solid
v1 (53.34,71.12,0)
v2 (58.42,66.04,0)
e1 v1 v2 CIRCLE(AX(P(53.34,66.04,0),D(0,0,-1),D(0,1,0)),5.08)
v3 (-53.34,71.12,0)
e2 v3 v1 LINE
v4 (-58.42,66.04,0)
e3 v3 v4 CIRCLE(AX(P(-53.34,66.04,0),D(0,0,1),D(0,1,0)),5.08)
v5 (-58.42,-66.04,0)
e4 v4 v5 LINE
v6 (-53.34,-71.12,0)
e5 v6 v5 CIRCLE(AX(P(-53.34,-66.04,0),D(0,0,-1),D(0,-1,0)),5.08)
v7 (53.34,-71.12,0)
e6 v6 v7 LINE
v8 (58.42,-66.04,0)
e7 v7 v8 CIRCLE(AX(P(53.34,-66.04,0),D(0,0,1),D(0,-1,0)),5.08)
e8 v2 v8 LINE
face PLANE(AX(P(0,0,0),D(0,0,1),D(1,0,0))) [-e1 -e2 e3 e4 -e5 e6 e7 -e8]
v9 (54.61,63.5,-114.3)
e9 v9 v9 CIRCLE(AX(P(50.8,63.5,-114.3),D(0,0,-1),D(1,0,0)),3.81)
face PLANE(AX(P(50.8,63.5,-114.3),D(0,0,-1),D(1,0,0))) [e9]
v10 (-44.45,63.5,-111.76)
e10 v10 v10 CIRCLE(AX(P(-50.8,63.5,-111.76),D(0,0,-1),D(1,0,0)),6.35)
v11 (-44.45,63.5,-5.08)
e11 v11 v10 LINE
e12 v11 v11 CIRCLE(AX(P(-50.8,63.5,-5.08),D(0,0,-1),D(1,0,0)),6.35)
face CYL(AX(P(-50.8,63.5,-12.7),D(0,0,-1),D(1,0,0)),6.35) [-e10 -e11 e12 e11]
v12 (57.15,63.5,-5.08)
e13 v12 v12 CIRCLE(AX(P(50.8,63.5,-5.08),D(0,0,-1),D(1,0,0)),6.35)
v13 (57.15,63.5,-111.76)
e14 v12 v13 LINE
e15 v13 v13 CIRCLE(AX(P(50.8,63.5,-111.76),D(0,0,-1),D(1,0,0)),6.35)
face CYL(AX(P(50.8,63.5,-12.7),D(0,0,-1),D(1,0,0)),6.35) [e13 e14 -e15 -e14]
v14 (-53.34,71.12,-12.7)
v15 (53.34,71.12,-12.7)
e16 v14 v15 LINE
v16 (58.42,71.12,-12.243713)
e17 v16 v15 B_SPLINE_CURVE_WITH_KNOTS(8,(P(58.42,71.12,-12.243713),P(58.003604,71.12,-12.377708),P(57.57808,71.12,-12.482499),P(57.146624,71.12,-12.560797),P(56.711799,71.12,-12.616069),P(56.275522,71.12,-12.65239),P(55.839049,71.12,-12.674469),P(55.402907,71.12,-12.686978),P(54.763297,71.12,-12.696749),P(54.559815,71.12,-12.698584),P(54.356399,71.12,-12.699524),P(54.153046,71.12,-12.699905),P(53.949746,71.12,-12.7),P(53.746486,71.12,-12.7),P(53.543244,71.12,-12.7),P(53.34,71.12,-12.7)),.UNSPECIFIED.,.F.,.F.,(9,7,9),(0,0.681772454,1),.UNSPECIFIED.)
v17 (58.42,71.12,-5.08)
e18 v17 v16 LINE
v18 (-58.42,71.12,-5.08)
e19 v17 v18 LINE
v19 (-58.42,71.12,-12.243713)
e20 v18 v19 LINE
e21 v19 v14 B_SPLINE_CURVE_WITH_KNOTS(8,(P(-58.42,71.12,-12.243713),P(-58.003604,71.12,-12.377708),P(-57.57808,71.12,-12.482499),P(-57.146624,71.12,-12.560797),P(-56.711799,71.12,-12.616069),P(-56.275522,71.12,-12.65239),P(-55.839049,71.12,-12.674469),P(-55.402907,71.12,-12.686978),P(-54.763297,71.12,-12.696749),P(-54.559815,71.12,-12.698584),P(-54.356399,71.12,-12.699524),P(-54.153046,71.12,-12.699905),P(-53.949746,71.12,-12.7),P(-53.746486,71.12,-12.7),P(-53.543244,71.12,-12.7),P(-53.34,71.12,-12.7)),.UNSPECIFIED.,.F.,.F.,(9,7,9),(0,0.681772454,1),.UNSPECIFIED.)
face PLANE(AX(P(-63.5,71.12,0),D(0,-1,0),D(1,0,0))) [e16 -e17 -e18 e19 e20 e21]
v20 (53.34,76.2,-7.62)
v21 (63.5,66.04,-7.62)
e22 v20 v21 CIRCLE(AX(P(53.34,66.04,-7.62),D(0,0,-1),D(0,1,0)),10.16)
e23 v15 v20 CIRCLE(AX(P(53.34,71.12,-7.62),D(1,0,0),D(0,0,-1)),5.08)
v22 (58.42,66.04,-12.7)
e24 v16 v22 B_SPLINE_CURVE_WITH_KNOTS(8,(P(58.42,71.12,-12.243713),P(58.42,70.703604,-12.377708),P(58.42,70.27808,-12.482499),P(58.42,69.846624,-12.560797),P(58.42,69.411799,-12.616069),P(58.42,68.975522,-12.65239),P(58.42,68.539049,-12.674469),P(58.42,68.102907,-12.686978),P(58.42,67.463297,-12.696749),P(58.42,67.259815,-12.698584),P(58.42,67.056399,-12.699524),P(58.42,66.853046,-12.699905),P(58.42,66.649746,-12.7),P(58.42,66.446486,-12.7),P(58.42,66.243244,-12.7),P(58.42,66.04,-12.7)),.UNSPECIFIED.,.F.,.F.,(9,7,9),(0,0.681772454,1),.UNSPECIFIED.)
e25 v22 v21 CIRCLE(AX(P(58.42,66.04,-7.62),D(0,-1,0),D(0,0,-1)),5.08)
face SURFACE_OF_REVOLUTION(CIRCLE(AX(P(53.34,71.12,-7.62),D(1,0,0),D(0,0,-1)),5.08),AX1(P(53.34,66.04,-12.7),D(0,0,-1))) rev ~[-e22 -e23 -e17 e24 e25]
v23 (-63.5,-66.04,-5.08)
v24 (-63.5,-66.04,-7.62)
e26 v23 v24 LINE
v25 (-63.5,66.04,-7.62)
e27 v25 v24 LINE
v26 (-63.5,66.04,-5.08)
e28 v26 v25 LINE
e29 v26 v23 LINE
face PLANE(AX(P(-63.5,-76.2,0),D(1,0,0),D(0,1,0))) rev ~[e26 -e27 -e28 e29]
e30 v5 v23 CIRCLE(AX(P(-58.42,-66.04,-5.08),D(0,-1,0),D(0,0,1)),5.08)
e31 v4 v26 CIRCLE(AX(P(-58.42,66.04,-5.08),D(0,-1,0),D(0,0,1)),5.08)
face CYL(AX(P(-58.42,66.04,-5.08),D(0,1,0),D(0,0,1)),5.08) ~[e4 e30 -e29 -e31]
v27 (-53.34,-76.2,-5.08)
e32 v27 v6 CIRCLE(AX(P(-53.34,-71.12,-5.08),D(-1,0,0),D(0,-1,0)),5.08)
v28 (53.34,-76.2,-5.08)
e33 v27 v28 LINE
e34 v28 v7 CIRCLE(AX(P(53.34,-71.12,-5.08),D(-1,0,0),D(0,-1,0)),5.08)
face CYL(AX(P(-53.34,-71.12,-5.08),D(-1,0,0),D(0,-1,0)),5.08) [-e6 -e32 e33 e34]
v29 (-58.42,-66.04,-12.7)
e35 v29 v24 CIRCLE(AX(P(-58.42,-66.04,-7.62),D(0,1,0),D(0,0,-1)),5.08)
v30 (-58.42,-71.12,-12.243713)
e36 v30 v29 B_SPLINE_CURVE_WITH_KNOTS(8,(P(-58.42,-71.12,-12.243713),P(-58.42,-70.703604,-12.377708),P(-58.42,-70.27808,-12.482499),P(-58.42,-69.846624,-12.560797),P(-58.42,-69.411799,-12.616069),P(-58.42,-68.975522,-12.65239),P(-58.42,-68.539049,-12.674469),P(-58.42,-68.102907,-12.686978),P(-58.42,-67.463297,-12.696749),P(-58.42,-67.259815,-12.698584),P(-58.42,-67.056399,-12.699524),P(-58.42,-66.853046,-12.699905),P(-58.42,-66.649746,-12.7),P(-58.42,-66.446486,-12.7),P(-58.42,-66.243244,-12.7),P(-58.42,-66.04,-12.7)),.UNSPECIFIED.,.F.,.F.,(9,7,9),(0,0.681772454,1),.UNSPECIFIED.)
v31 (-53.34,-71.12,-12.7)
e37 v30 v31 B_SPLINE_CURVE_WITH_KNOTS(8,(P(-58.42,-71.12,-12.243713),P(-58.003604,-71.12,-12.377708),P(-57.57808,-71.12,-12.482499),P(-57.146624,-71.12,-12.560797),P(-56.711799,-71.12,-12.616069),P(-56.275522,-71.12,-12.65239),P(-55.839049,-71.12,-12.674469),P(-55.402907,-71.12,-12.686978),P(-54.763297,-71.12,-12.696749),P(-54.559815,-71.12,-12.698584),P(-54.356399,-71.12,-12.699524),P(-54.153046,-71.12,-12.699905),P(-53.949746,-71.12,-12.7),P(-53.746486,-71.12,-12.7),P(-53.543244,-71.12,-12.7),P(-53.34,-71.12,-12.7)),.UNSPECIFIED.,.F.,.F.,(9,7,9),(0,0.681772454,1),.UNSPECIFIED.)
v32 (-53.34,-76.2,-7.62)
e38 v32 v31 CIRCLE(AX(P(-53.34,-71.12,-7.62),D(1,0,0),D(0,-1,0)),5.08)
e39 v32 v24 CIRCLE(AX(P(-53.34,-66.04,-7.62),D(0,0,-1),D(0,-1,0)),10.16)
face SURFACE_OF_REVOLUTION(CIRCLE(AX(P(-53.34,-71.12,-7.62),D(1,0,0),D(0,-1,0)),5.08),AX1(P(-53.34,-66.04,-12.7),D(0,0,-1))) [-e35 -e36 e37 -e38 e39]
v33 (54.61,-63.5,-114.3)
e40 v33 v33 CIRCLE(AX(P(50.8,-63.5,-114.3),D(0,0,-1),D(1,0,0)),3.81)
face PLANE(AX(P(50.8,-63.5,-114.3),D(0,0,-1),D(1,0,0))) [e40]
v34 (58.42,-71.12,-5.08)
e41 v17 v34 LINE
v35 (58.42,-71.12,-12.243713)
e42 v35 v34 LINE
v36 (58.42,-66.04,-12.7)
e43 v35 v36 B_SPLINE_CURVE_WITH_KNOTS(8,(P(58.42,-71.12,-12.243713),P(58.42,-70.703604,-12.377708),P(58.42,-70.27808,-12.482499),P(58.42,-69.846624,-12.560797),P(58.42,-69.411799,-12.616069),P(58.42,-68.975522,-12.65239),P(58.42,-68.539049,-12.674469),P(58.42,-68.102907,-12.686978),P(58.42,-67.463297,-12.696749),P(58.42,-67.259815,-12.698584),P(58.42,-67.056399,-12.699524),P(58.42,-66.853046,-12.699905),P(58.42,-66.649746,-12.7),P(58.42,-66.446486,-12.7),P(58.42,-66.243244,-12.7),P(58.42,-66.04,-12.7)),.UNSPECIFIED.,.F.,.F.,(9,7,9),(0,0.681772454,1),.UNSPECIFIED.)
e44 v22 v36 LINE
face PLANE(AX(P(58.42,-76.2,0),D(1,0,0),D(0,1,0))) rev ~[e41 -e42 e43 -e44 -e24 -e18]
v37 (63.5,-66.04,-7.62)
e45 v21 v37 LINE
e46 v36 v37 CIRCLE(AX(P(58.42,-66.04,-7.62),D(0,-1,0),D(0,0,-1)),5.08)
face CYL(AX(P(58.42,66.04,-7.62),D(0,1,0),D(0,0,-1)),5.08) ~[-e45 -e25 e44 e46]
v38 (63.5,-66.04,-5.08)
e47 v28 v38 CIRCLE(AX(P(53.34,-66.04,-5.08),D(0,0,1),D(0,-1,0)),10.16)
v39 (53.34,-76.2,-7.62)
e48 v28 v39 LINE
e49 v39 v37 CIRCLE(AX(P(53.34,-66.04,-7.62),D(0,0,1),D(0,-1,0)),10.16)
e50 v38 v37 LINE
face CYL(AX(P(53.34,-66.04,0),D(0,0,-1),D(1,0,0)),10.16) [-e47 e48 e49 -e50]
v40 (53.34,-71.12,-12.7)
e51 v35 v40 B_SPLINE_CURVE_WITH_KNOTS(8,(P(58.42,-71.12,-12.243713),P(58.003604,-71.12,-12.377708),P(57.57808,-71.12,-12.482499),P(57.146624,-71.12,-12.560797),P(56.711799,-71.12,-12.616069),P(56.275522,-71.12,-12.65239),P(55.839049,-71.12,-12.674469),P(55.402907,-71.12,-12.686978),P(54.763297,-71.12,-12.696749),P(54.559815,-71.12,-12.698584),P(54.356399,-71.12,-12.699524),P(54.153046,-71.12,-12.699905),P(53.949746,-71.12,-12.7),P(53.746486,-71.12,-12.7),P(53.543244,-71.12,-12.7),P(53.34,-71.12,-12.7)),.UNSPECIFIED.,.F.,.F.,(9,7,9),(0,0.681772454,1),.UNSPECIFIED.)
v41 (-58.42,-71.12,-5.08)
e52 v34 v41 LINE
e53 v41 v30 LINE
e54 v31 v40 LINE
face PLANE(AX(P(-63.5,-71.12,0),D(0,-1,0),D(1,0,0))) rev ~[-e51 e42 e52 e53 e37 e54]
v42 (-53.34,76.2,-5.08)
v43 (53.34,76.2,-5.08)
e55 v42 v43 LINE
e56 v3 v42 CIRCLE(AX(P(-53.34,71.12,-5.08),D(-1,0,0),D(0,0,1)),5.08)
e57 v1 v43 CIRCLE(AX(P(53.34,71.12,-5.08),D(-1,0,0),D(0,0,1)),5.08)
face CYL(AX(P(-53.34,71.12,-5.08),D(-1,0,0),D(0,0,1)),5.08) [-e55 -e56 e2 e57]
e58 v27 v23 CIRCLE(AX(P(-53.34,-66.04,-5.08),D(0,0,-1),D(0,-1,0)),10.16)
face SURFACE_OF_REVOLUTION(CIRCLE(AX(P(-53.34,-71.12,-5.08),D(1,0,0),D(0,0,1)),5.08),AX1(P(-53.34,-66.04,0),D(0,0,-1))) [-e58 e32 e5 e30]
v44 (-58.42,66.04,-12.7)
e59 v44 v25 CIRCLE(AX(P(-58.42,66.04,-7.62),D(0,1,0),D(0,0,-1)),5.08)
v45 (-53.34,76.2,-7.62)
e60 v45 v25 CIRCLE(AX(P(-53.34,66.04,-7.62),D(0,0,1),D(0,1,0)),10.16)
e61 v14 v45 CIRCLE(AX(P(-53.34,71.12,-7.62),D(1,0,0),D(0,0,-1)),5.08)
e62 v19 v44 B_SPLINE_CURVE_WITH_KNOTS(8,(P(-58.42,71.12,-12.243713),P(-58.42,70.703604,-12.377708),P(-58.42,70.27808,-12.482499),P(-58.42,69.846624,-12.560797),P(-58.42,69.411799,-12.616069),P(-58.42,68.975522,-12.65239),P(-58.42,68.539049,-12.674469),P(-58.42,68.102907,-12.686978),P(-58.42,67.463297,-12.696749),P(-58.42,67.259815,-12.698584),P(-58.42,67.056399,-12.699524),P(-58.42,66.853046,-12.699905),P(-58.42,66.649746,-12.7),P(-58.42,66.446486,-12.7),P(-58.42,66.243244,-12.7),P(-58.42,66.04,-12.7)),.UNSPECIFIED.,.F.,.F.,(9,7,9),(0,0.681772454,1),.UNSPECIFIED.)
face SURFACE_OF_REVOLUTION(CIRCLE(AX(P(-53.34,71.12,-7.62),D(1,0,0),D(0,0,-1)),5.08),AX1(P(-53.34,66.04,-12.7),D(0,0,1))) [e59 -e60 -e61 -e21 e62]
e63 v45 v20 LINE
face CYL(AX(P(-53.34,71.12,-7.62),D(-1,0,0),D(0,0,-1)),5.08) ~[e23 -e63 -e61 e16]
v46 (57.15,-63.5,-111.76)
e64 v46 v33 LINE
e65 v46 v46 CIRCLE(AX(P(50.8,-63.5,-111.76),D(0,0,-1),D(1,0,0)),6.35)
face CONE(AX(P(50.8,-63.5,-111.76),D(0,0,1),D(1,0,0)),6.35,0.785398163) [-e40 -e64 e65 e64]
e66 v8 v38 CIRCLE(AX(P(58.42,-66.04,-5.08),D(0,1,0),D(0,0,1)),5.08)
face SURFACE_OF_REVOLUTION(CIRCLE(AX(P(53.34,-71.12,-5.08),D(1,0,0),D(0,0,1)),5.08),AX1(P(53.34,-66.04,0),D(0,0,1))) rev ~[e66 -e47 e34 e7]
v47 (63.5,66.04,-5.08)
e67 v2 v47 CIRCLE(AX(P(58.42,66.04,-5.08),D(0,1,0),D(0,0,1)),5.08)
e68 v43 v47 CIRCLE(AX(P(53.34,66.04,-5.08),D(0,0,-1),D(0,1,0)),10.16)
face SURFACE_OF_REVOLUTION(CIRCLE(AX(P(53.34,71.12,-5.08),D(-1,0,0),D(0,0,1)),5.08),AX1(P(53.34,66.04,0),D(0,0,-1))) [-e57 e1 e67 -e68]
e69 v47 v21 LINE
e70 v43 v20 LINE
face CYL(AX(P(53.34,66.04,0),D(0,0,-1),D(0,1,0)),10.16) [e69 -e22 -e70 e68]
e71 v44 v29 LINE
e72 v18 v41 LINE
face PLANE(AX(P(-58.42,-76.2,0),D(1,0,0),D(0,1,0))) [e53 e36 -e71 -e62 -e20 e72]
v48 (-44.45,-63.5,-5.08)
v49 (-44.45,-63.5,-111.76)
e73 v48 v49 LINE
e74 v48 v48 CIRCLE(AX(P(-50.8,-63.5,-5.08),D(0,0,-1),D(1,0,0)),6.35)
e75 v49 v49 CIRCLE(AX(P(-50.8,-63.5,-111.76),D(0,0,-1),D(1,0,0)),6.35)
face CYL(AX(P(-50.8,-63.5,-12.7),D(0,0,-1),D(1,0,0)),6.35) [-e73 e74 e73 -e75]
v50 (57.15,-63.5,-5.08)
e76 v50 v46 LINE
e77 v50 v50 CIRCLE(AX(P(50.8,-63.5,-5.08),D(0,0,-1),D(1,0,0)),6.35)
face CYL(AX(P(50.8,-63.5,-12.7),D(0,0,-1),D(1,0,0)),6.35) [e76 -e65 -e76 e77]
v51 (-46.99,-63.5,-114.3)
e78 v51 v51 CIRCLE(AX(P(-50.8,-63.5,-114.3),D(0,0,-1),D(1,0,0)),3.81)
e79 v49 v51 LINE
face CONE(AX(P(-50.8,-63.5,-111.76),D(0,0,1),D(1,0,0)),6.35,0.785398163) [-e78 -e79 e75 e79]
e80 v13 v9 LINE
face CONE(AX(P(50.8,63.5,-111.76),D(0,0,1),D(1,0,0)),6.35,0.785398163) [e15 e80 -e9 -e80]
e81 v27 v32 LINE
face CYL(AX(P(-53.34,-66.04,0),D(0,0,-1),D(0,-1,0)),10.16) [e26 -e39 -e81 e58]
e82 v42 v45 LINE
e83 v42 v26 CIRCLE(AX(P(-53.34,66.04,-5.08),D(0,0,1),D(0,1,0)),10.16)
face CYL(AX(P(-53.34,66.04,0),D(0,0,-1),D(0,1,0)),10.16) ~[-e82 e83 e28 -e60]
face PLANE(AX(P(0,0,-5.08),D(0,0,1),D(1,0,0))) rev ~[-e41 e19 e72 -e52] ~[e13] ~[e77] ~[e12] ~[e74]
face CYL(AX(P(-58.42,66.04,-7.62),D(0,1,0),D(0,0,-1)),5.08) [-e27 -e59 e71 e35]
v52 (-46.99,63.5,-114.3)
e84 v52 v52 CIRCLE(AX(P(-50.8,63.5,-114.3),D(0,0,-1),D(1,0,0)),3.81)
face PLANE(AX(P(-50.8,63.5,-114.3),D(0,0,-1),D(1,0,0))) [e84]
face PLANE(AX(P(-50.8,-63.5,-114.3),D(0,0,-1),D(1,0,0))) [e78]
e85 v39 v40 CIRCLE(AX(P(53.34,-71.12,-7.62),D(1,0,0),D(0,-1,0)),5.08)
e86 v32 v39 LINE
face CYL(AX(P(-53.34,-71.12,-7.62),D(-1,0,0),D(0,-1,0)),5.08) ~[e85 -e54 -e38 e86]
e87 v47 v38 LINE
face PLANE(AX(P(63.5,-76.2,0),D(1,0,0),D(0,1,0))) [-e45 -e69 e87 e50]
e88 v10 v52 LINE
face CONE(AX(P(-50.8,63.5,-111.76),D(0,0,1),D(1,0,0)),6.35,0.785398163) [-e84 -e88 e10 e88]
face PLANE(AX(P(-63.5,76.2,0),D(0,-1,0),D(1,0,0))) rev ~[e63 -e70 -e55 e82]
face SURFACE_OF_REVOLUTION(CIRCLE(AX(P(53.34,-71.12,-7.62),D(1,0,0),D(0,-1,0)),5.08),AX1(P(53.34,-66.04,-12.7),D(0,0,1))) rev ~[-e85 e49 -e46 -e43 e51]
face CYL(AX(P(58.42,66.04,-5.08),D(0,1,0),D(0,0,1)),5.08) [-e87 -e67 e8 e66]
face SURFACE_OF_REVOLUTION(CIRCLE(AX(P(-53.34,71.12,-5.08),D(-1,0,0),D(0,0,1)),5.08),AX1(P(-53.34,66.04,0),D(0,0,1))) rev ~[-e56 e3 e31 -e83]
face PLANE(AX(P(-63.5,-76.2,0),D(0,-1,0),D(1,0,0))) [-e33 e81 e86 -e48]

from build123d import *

# Parameters (mm, degrees)
F0_W          = 127
F0_H          = 152.4
F1_DEPTH      = 12.7
F2_T          = -5.08
F3_R          = 6.35
F4_DEPTH      = 101.6
F4_DEPTH_BACK = 7.62
F5_R          = 10.16
F6_T1_DEPTH   = 132.08
F6_T3_DEPTH   = 106.68
F6_T6_ANGLE   = 90
F6_T8_ANGLE   = 90
F6_T10_ANGLE  = 90
F6_T12_ANGLE  = 90
F6_T14_ANGLE  = 90
F6_T16_ANGLE  = 90
F6_T18_ANGLE  = 90
F6_T20_ANGLE  = 90
F7_SIZE       = 2.54


# Not quite as in the source:
# - a fillet or chamfer that OpenCascade refuses, or shapes differently, is made with other operations: its cross-section is extruded or revolved along the edge and cut away or added


with BuildPart() as f1:
    # F0 (on Top) → F1 (new body)
    with BuildSketch(Plane.XY):
        Rectangle(F0_W, F0_H)
    extrude(amount=-F1_DEPTH)

    # F2
    f2_openings = [f1.faces().sort_by_distance(p)[0] for p in [
        (0, 0, -12.7),
    ]]
    offset(amount=F2_T, openings=f2_openings)

    # F3 (on face) → F4 (join, two sides)
    with BuildSketch(Plane(origin=(0, 0, -12.7), x_dir=(1, 0, 0), z_dir=(0, 0, -1))) as f4_sk:
        with Locations((-50.8, 63.5)):
            Circle(F3_R)
        with Locations((50.8, 63.5)):
            Circle(F3_R)
        with Locations((50.8, -63.5)):
            Circle(F3_R)
        with Locations((-50.8, -63.5)):
            Circle(F3_R)
    extrude(amount=F4_DEPTH)
    extrude(f4_sk.sketch, amount=-F4_DEPTH_BACK)

    # F5
    f5_edges = [f1.edges().sort_by_distance(p)[0] for p in [
        (-63.5, -76.2, -6.35),
        (-63.5, 76.2, -6.35),
        (63.5, 76.2, -6.35),
        (63.5, -76.2, -6.35),
    ]]
    fillet(f5_edges, radius=F5_R)

    # F6: fillet of radius 5.08 on 18 edges, made by hand

    # F6_s2 → F6_t1 (cut)
    with BuildSketch(Plane.XZ.offset(-66.04)):
        with BuildLine():
            ThreePointArc((-58.42, 0), (-62.0121024484, -1.4878975516), (-63.5, -5.08))
            Line((-63.5, -5.08), (-63.5, 0))
            Line((-63.5, 0), (-58.42, 0))
        make_face()
        with BuildLine():
            ThreePointArc((-58.42, -12.7), (-62.0121024484, -11.2121024484), (-63.5, -7.62))
            Line((-63.5, -7.62), (-63.5, -12.7))
            Line((-63.5, -12.7), (-58.42, -12.7))
        make_face()
        with BuildLine():
            ThreePointArc((58.42, 0), (62.0121024484, -1.4878975516), (63.5, -5.08))
            Line((63.5, -5.08), (63.5, 0))
            Line((63.5, 0), (58.42, 0))
        make_face()
        with BuildLine():
            ThreePointArc((58.42, -12.7), (62.0121024484, -11.2121024484), (63.5, -7.62))
            Line((63.5, -7.62), (63.5, -12.7))
            Line((63.5, -12.7), (58.42, -12.7))
        make_face()
    extrude(amount=F6_T1_DEPTH, mode=Mode.SUBTRACT)

    # F6_s4 → F6_t3 (cut)
    with BuildSketch(Plane.YZ.offset(-53.34)):
        with BuildLine():
            ThreePointArc((-76.2, -5.08), (-74.7121024484, -1.4878975516), (-71.12, 0))
            Line((-71.12, 0), (-76.2, 0))
            Line((-76.2, 0), (-76.2, -5.08))
        make_face()
        with BuildLine():
            ThreePointArc((-76.2, -7.62), (-74.7121024484, -11.2121024484), (-71.12, -12.7))
            Line((-71.12, -12.7), (-76.2, -12.7))
            Line((-76.2, -12.7), (-76.2, -7.62))
        make_face()
        with BuildLine():
            ThreePointArc((71.12, 0), (74.7121024484, -1.4878975516), (76.2, -5.08))
            Line((76.2, -5.08), (76.2, 0))
            Line((76.2, 0), (71.12, 0))
        make_face()
        with BuildLine():
            ThreePointArc((71.12, -12.7), (74.7121024484, -11.2121024484), (76.2, -7.62))
            Line((76.2, -7.62), (76.2, -12.7))
            Line((76.2, -12.7), (71.12, -12.7))
        make_face()
    extrude(amount=F6_T3_DEPTH, mode=Mode.SUBTRACT)

    # F6_s5 → F6_t6 (revolve, cut)
    with BuildSketch(Plane.YZ.offset(-53.34)):
        with BuildLine():
            ThreePointArc((-71.12, 0), (-74.7121024484, -1.4878975516), (-76.2, -5.08))
            Line((-76.2, -5.08), (-76.2, 0))
            Line((-76.2, 0), (-71.12, 0))
        make_face()
    revolve(axis=Axis((-53.34, -66.04, 0), (0, 0, -1)), revolution_arc=F6_T6_ANGLE, mode=Mode.SUBTRACT)

    # F6_s7 → F6_t8 (revolve, cut)
    with BuildSketch(Plane.YZ.offset(53.34)):
        with BuildLine():
            ThreePointArc((-71.12, 0), (-74.7121024484, -1.4878975516), (-76.2, -5.08))
            Line((-76.2, -5.08), (-76.2, 0))
            Line((-76.2, 0), (-71.12, 0))
        make_face()
    revolve(axis=Axis((53.34, -66.04, 0), (0, 0, 1)), revolution_arc=F6_T8_ANGLE, mode=Mode.SUBTRACT)

    # F6_s9 → F6_t10 (revolve, cut)
    with BuildSketch(Plane.YZ.offset(-53.34)):
        with BuildLine():
            ThreePointArc((71.12, 0), (74.7121024484, -1.4878975516), (76.2, -5.08))
            Line((76.2, -5.08), (76.2, 0))
            Line((76.2, 0), (71.12, 0))
        make_face()
    revolve(axis=Axis((-53.34, 66.04, 0), (0, 0, 1)), revolution_arc=F6_T10_ANGLE, mode=Mode.SUBTRACT)

    # F6_s11 → F6_t12 (revolve, cut)
    with BuildSketch(Plane.YZ.offset(53.34)):
        with BuildLine():
            ThreePointArc((71.12, 0), (74.7121024484, -1.4878975516), (76.2, -5.08))
            Line((76.2, -5.08), (76.2, 0))
            Line((76.2, 0), (71.12, 0))
        make_face()
    revolve(axis=Axis((53.34, 66.04, 0), (0, 0, -1)), revolution_arc=F6_T12_ANGLE, mode=Mode.SUBTRACT)

    # F6_s13 → F6_t14 (revolve, cut)
    with BuildSketch(Plane.YZ.offset(-53.34)):
        with BuildLine():
            ThreePointArc((-76.2, -7.62), (-74.7121024484, -11.2121024484), (-71.12, -12.7))
            Line((-71.12, -12.7), (-76.2, -12.7))
            Line((-76.2, -12.7), (-76.2, -7.62))
        make_face()
    revolve(axis=Axis((-53.34, -66.04, -12.7), (0, 0, -1)), revolution_arc=F6_T14_ANGLE, mode=Mode.SUBTRACT)

    # F6_s15 → F6_t16 (revolve, cut)
    with BuildSketch(Plane.YZ.offset(53.34)):
        with BuildLine():
            ThreePointArc((-76.2, -7.62), (-74.7121024484, -11.2121024484), (-71.12, -12.7))
            Line((-71.12, -12.7), (-76.2, -12.7))
            Line((-76.2, -12.7), (-76.2, -7.62))
        make_face()
    revolve(axis=Axis((53.34, -66.04, -12.7), (0, 0, 1)), revolution_arc=F6_T16_ANGLE, mode=Mode.SUBTRACT)

    # F6_s17 → F6_t18 (revolve, cut)
    with BuildSketch(Plane.YZ.offset(-53.34)):
        with BuildLine():
            ThreePointArc((71.12, -12.7), (74.7121024484, -11.2121024484), (76.2, -7.62))
            Line((76.2, -7.62), (76.2, -12.7))
            Line((76.2, -12.7), (71.12, -12.7))
        make_face()
    revolve(axis=Axis((-53.34, 66.04, -12.7), (0, 0, 1)), revolution_arc=F6_T18_ANGLE, mode=Mode.SUBTRACT)

    # F6_s19 → F6_t20 (revolve, cut)
    with BuildSketch(Plane.YZ.offset(53.34)):
        with BuildLine():
            ThreePointArc((71.12, -12.7), (74.7121024484, -11.2121024484), (76.2, -7.62))
            Line((76.2, -7.62), (76.2, -12.7))
            Line((76.2, -12.7), (71.12, -12.7))
        make_face()
    revolve(axis=Axis((53.34, 66.04, -12.7), (0, 0, -1)), revolution_arc=F6_T20_ANGLE, mode=Mode.SUBTRACT)

    # F7
    f7_edges = [f1.edges().sort_by_distance(p)[0] for p in [
        (-57.15, -63.5, -114.3),
        (44.45, -63.5, -114.3),
        (-57.15, 63.5, -114.3),
        (44.45, 63.5, -114.3),
    ]]
    chamfer(f7_edges, length=F7_SIZE)


solid = f1.part
